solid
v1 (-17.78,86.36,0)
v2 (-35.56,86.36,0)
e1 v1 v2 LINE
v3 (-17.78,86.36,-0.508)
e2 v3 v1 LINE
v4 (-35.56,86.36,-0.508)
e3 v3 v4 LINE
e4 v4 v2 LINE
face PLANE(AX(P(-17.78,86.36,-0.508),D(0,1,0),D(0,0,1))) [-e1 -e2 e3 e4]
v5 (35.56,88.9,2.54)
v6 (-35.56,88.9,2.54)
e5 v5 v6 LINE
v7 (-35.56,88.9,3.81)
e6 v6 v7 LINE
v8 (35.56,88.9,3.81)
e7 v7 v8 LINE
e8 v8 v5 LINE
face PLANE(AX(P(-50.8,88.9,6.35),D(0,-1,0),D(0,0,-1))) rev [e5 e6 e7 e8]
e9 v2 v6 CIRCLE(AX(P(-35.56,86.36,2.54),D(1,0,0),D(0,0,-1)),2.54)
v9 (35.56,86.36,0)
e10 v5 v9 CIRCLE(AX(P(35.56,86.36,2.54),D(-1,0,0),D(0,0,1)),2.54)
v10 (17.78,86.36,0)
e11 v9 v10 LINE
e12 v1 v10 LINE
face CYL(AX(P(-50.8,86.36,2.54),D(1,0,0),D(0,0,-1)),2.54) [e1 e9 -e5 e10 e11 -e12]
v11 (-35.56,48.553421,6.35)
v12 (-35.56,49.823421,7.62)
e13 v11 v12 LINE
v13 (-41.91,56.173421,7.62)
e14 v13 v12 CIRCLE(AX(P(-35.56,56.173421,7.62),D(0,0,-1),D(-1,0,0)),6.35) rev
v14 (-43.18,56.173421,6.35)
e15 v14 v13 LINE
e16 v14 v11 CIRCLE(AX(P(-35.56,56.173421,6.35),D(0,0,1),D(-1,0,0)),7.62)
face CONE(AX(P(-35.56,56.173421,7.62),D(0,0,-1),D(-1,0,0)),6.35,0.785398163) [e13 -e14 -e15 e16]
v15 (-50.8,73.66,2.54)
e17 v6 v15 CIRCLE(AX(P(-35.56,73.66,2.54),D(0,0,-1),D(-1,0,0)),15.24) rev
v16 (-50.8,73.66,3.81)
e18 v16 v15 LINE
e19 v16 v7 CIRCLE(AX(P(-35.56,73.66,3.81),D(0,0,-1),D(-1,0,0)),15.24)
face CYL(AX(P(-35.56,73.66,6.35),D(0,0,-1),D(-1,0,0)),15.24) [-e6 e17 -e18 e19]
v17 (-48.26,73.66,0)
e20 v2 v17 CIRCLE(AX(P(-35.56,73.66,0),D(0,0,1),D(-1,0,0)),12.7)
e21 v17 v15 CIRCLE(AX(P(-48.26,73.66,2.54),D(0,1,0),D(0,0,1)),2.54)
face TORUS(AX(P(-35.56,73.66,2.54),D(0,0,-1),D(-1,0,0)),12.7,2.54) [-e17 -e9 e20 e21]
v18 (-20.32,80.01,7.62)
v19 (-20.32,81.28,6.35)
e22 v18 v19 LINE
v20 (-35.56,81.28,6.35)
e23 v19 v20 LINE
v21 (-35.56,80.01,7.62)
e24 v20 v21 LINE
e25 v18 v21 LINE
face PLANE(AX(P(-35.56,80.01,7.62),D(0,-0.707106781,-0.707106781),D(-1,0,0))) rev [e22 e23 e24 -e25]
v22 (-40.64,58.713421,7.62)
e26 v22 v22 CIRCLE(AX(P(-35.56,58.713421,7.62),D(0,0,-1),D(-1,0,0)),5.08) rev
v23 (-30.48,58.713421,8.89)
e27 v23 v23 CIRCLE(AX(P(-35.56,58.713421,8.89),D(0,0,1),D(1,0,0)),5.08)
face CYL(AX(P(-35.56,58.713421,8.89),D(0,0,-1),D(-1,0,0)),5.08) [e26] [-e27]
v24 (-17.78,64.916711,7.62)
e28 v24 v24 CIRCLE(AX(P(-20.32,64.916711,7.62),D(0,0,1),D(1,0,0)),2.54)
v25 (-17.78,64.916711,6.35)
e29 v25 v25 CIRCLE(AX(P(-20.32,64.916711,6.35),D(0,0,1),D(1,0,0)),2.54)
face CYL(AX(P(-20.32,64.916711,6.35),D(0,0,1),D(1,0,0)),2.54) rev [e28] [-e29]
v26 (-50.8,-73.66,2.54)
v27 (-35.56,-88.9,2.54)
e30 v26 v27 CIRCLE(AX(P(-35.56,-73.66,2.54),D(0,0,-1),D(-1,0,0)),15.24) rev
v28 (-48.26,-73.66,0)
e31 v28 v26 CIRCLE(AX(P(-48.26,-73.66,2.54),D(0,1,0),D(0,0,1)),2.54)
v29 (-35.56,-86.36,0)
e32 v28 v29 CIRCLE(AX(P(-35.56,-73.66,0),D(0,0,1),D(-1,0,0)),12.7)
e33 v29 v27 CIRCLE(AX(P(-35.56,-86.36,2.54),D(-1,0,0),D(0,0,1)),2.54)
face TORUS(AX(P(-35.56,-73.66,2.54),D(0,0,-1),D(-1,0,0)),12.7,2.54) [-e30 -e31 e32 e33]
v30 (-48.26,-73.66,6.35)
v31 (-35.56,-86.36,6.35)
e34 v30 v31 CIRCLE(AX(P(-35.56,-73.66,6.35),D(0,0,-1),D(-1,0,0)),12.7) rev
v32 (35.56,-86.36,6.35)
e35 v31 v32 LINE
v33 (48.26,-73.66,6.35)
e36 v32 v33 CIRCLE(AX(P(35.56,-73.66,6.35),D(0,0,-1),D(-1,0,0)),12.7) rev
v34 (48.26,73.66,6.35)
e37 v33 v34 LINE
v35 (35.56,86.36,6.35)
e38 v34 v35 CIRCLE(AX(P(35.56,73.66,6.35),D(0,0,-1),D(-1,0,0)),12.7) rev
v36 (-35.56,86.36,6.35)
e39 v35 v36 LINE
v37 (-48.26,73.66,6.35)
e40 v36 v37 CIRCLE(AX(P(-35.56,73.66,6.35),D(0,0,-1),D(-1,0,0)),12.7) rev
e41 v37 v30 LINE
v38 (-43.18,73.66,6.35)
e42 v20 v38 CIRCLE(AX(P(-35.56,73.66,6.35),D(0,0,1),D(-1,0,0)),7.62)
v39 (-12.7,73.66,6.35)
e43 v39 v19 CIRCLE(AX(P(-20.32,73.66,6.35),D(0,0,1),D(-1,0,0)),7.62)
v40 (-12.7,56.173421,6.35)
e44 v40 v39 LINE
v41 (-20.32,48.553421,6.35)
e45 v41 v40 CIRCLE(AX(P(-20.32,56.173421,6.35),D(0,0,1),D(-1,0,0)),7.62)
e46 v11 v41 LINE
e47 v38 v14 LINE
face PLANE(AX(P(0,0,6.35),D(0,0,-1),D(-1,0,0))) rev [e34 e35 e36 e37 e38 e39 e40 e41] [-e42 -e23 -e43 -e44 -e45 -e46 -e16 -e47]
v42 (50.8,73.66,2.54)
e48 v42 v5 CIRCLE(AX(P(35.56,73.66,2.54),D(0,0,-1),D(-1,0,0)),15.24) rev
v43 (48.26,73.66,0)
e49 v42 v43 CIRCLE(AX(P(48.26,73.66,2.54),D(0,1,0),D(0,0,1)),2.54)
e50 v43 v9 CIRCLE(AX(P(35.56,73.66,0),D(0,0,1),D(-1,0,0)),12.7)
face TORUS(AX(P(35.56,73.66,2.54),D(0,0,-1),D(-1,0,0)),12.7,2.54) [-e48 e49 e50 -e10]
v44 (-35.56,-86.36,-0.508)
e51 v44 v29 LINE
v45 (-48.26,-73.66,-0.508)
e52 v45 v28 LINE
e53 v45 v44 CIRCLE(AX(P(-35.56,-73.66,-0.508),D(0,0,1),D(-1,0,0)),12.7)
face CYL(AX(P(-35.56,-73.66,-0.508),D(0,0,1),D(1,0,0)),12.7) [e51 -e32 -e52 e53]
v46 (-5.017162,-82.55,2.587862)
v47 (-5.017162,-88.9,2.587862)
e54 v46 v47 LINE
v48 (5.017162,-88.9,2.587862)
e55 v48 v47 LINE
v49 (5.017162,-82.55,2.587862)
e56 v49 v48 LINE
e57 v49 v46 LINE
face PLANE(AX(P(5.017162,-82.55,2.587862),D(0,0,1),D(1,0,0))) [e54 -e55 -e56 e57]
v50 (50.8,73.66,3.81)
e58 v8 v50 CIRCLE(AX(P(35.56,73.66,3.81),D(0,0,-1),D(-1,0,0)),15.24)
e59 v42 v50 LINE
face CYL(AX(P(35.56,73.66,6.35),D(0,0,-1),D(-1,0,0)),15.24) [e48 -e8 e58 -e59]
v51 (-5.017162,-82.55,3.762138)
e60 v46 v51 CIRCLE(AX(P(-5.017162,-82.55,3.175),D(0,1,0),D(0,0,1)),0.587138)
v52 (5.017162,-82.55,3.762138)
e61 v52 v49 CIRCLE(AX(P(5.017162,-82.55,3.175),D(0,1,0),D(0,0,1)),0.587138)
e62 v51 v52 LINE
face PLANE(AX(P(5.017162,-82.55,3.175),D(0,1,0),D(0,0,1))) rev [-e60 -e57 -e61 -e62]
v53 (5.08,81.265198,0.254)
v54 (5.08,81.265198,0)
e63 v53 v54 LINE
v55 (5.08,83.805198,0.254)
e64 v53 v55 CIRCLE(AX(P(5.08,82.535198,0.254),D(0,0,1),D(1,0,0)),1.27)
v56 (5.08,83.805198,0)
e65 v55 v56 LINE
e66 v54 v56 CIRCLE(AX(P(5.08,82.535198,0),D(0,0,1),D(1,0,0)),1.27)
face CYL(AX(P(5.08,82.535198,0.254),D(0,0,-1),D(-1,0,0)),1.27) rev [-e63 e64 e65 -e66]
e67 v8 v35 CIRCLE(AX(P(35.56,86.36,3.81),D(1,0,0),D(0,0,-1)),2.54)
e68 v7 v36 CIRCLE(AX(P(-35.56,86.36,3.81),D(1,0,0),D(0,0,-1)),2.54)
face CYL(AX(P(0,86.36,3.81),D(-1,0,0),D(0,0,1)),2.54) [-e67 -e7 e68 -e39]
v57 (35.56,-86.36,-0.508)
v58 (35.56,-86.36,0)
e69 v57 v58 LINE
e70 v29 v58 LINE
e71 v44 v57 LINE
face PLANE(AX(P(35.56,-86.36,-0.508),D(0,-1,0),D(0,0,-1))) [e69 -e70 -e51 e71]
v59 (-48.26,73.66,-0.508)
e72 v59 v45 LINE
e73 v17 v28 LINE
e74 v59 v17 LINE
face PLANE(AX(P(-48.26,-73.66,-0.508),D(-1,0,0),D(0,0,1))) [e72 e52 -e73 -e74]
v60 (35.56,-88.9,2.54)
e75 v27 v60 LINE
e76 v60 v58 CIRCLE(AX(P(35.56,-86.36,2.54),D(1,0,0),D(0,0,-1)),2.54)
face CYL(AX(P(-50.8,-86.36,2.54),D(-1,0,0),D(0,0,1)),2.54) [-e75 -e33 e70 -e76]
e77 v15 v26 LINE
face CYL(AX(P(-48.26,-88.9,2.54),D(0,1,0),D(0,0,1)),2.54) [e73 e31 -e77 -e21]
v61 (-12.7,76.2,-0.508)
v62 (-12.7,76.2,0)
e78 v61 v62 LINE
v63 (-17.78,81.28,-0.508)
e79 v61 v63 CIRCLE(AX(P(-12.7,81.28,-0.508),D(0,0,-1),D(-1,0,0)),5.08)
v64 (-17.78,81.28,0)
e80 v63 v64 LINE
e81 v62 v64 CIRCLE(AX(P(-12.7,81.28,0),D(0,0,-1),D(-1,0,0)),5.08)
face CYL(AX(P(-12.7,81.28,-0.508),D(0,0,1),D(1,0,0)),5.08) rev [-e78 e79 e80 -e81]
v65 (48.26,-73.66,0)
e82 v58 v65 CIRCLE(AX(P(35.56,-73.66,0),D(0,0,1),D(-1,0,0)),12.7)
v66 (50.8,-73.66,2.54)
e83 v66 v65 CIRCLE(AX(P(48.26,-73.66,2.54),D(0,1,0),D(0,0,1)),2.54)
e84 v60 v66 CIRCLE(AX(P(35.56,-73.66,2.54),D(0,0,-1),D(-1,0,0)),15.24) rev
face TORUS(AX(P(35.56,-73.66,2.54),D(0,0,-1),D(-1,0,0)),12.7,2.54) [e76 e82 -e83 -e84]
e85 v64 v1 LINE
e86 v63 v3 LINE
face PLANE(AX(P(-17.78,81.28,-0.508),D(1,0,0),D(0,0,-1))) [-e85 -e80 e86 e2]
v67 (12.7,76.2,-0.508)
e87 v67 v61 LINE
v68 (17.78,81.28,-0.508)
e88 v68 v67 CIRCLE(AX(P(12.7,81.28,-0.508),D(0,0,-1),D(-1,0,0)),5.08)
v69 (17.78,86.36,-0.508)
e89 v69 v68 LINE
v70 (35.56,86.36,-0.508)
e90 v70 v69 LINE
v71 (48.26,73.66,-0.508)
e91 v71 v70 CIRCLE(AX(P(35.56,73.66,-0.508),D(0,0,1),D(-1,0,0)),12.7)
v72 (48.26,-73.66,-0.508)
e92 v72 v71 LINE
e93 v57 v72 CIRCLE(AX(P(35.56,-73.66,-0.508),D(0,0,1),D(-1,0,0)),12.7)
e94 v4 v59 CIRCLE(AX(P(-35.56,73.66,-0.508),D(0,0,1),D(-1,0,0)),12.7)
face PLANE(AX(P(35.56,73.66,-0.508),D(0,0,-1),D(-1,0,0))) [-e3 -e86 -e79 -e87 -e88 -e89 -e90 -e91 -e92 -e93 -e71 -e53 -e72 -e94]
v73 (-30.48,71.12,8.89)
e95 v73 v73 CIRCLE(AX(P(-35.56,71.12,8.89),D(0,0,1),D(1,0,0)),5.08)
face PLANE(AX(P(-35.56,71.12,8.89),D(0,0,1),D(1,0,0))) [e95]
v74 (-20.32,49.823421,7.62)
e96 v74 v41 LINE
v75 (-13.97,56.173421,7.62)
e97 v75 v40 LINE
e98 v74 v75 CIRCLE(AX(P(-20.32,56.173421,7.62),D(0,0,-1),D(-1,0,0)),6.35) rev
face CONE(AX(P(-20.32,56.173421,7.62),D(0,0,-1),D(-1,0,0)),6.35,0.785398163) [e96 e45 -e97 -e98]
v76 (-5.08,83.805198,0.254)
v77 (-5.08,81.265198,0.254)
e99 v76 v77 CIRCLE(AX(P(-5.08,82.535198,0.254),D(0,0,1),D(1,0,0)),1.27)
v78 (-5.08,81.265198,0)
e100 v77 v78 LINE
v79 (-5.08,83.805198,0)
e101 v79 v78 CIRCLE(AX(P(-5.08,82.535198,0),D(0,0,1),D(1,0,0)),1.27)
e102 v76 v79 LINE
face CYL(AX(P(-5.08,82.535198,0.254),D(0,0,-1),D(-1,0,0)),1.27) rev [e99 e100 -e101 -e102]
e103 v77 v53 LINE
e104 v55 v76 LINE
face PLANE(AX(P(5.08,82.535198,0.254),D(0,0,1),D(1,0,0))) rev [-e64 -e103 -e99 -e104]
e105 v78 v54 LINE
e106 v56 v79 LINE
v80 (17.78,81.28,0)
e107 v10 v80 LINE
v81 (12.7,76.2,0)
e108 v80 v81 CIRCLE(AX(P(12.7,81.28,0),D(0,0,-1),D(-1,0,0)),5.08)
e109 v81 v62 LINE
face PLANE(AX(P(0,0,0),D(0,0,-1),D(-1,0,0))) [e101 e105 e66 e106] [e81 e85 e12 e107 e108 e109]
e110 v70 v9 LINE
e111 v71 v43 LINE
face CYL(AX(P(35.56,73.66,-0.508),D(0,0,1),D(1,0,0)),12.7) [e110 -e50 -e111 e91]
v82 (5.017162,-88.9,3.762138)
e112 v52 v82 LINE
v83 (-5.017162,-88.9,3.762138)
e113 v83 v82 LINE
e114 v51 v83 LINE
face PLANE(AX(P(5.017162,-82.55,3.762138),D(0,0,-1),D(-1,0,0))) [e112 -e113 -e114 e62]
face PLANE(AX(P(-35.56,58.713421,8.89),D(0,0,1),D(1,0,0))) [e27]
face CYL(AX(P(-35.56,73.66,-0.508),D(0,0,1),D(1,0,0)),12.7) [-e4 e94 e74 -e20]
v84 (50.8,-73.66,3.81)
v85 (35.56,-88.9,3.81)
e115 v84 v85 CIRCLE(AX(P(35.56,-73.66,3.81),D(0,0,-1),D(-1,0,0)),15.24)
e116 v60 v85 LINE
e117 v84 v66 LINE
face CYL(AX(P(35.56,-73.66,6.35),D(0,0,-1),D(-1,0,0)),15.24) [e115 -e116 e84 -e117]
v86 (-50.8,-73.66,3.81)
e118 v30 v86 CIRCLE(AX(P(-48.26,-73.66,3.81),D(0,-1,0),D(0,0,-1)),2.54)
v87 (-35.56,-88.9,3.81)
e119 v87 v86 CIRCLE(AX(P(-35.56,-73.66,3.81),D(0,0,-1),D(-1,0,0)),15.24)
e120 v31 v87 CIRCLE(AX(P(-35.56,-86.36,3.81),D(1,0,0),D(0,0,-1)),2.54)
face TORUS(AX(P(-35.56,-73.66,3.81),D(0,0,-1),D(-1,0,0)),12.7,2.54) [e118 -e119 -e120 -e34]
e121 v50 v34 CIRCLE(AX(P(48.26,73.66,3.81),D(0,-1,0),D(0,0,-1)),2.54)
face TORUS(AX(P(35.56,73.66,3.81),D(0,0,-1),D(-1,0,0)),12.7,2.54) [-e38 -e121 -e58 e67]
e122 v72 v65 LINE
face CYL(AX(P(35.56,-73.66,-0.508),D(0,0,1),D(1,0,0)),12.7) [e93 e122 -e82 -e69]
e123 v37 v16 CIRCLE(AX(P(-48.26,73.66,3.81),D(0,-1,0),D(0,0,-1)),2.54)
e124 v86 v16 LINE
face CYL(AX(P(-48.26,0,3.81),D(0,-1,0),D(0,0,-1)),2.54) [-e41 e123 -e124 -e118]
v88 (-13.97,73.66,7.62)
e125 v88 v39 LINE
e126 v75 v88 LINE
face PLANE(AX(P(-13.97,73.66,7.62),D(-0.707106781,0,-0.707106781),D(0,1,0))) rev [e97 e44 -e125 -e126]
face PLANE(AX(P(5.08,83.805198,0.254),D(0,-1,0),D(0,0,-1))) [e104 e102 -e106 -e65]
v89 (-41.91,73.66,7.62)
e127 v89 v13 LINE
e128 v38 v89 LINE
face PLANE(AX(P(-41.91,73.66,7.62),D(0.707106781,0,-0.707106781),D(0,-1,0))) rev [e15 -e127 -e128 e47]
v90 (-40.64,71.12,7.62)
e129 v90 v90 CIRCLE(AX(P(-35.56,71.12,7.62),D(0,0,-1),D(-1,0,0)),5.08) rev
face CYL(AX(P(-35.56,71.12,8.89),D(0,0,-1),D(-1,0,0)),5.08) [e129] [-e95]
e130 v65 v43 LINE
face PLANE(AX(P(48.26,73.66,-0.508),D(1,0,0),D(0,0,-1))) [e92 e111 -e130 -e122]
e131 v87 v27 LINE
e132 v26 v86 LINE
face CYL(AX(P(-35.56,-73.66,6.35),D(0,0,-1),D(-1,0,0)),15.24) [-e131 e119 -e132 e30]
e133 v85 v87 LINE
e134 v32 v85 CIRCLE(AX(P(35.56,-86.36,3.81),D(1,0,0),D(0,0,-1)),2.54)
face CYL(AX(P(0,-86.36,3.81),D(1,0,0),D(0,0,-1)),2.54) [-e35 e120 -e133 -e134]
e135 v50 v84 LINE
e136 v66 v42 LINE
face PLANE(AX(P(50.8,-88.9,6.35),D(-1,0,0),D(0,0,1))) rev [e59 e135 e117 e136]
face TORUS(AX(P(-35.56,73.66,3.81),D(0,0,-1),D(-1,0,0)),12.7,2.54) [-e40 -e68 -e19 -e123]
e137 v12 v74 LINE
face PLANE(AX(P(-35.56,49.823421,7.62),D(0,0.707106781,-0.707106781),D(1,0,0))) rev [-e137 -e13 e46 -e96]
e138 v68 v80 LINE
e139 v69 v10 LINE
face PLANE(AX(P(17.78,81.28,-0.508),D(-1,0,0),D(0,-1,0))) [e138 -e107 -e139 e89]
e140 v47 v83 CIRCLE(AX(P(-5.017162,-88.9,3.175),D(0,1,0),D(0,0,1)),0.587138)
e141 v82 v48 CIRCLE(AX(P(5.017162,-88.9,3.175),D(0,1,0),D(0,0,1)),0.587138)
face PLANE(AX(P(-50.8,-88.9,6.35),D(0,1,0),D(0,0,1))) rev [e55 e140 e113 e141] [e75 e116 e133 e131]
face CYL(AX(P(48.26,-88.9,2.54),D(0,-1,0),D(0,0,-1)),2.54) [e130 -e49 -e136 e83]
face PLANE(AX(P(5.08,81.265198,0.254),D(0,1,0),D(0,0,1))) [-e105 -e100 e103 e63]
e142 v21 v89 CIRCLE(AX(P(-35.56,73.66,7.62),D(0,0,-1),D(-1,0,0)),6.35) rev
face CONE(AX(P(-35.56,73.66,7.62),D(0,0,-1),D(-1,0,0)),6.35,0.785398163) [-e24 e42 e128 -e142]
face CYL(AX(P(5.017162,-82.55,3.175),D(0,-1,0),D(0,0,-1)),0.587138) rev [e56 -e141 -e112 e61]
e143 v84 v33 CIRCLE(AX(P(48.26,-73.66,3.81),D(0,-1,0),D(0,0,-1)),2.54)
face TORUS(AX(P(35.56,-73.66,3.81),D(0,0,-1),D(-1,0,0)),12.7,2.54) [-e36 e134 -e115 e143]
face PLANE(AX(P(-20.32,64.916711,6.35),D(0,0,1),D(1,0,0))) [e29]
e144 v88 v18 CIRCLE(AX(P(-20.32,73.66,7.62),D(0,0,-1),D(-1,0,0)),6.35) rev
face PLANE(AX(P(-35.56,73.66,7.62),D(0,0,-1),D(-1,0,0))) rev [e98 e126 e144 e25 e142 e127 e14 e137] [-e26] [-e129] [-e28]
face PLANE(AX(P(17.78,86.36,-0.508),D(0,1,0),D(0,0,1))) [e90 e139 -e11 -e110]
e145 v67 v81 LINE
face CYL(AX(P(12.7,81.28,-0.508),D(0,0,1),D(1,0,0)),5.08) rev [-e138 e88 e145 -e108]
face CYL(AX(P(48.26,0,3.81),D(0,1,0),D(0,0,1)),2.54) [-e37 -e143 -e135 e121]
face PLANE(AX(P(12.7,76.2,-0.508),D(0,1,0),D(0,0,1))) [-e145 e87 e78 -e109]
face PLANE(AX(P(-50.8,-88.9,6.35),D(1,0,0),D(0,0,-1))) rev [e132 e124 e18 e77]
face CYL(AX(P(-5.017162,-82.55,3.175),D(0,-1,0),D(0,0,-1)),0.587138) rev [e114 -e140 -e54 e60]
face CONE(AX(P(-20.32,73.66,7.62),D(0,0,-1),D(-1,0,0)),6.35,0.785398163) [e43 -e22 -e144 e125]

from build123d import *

# Parameters (mm, degrees)
SKETCH1_W            = 101.6
SKETCH1_H            = 177.8
BOSS_EXTRUDE2_DEPTH  = 6.35
FILLET1_R            = 15.24
BOSS_EXTRUDE5_DEPTH  = 0.508
CUT_EXTRUDE1_DEPTH   = 0.254
FILLET3_R            = 2.54
FILLET4_R            = 2.54
BOSS_EXTRUDE7_DEPTH  = 1.27
SKETCH6_R            = 5.08
BOSS_EXTRUDE10_DEPTH = 1.27
SKETCH7_R            = 2.54
CUT_EXTRUDE2_DEPTH   = 1.27
CHAMFER1_SIZE        = 1.27
CUT_EXTRUDE6_DEPTH   = 6.35


with BuildPart() as part:
    # Sketch1 → Boss-Extrude2 (new body)
    with BuildSketch(Plane.XY):
        Rectangle(SKETCH1_W, SKETCH1_H)
    extrude(amount=BOSS_EXTRUDE2_DEPTH)

    # Fillet1
    fillet1_edges = [part.edges().sort_by_distance(p)[0] for p in [
        (50.8, -88.9, 3.175),
        (-50.8, -88.9, 3.175),
        (-50.8, 88.9, 3.175),
        (50.8, 88.9, 3.175),
    ]]
    fillet(fillet1_edges, radius=FILLET1_R)

    # Sketch2 → Boss-Extrude5 (add)
    with BuildSketch(Plane.XY):
        with BuildLine():
            Line((12.7, 76.2), (-12.7, 76.2))
            ThreePointArc((-12.7, 76.2), (-16.292102448, 77.687897552), (-17.78, 81.28))
            Line((-17.78, 81.28), (-17.78, 86.36))
            Line((-17.78, 86.36), (-35.56, 86.36))
            ThreePointArc((-35.56, 86.36), (-44.540256121, 82.640256121), (-48.26, 73.66))
            Line((-48.26, 73.66), (-48.26, -73.66))
            ThreePointArc((-48.26, -73.66), (-44.540256121, -82.640256121), (-35.56, -86.36))
            Line((-35.56, -86.36), (35.56, -86.36))
            ThreePointArc((35.56, -86.36), (44.540256121, -82.640256121), (48.26, -73.66))
            Line((48.26, -73.66), (48.26, 73.66))
            ThreePointArc((48.26, 73.66), (44.540256121, 82.640256121), (35.56, 86.36))
            Line((35.56, 86.36), (17.78, 86.36))
            Line((17.78, 86.36), (17.78, 81.28))
            ThreePointArc((17.78, 81.28), (16.292102448, 77.687897552), (12.7, 76.2))
        make_face()
    extrude(amount=-BOSS_EXTRUDE5_DEPTH)

    # Sketch3 → Cut-Extrude1 (cut)
    with BuildSketch(Plane.XY):
        with BuildLine():
            Line((5.08, 81.26519761), (-5.08, 81.26519761))
            ThreePointArc((-5.08, 81.26519761), (-6.35, 82.53519761), (-5.08, 83.80519761))
            Line((-5.08, 83.80519761), (5.08, 83.80519761))
            ThreePointArc((5.08, 83.80519761), (6.35, 82.53519761), (5.08, 81.26519761))
        make_face()
    extrude(amount=CUT_EXTRUDE1_DEPTH, mode=Mode.SUBTRACT)

    # Fillet3
    fillet3_edges = [part.edges().sort_by_distance(p)[0] for p in [
        (0, -88.9, 0),
        (50.8, 0, 0),
        (-50.8, 0, 0),
        (0, 88.9, 0),
        (-46.336307345, 84.436307345, 0),
        (46.336307345, 84.436307345, 0),
        (46.336307345, -84.436307345, 0),
        (-46.336307345, -84.436307345, 0),
    ]]
    fillet(fillet3_edges, radius=FILLET3_R - 0.0001)  # a hair under: the kernel refuses the full size

    # Fillet4
    fillet4_edges = [part.edges().sort_by_distance(p)[0] for p in [
        (0, -88.9, 6.35),
        (-50.8, 0, 6.35),
        (50.8, 0, 6.35),
        (0, 88.9, 6.35),
        (-46.336307345, 84.436307345, 6.35),
        (46.336307345, 84.436307345, 6.35),
        (46.336307345, -84.436307345, 6.35),
        (-46.336307345, -84.436307345, 6.35),
    ]]
    fillet(fillet4_edges, radius=FILLET4_R)

    # Sketch4 → Boss-Extrude7 (add)
    with BuildSketch(Plane.XY.offset(6.35)):
        with BuildLine():
            Line((-12.7, 73.66), (-12.7, 56.173421011))
            ThreePointArc((-12.7, 56.173421011), (-14.931846327, 50.785267338), (-20.32, 48.553421011))
            Line((-20.32, 48.553421011), (-35.56, 48.553421011))
            ThreePointArc((-35.56, 48.553421011), (-40.948153673, 50.785267338), (-43.18, 56.173421011))
            Line((-43.18, 56.173421011), (-43.18, 73.66))
            ThreePointArc((-43.18, 73.66), (-40.948153673, 79.048153673), (-35.56, 81.28))
            Line((-35.56, 81.28), (-20.32, 81.28))
            ThreePointArc((-20.32, 81.28), (-14.931846327, 79.048153673), (-12.7, 73.66))
        make_face()
    extrude(amount=BOSS_EXTRUDE7_DEPTH)

    # Sketch6 → Boss-Extrude10 (add)
    with BuildSketch(Plane.XY.offset(7.62)):
        with Locations(Location((-35.56, 58.713421011, 0), (0, 0, 180))):
            Circle(SKETCH6_R)
        with Locations(Location((-35.56, 71.12, 0), (0, 0, 180))):
            Circle(SKETCH6_R)
    extrude(amount=BOSS_EXTRUDE10_DEPTH)

    # Sketch7 → Cut-Extrude2 (cut)
    with BuildSketch(Plane.XY.offset(7.62)):
        with Locations((-20.32, 64.916710506)):
            Circle(SKETCH7_R)
    extrude(amount=-CUT_EXTRUDE2_DEPTH, mode=Mode.SUBTRACT)

    # Chamfer1
    chamfer1_edges = [part.edges().sort_by_distance(p)[0] for p in [
        (-27.94, 81.28, 7.62),
        (-14.931846327, 79.048153673, 7.62),
        (-12.7, 64.916710506, 7.62),
        (-14.931846327, 50.785267338, 7.62),
        (-27.94, 48.553421011, 7.62),
        (-40.948153673, 50.785267338, 7.62),
        (-43.18, 64.916710506, 7.62),
        (-40.948153673, 79.048153673, 7.62),
    ]]
    chamfer(chamfer1_edges, length=CHAMFER1_SIZE - 0.0001)  # a hair under: the kernel refuses the full size

    # Sketch9 → Cut-Extrude6 (cut)
    with BuildSketch(Plane(origin=(0, -88.9, 0), x_dir=(1, 0, 0), z_dir=(0, 1, 0))):
        with BuildLine():
            Line((5.017161758, -3.762137851), (-5.017161758, -3.762137851))
            ThreePointArc((-5.017161758, -3.762137851), (-5.604299609, -3.175), (-5.017161758, -2.587862149))
            Line((-5.017161758, -2.587862149), (5.017161758, -2.587862149))
            ThreePointArc((5.017161758, -2.587862149), (5.604299609, -3.175), (5.017161758, -3.762137851))
        make_face()
    extrude(amount=CUT_EXTRUDE6_DEPTH, mode=Mode.SUBTRACT)


solid = part.part
